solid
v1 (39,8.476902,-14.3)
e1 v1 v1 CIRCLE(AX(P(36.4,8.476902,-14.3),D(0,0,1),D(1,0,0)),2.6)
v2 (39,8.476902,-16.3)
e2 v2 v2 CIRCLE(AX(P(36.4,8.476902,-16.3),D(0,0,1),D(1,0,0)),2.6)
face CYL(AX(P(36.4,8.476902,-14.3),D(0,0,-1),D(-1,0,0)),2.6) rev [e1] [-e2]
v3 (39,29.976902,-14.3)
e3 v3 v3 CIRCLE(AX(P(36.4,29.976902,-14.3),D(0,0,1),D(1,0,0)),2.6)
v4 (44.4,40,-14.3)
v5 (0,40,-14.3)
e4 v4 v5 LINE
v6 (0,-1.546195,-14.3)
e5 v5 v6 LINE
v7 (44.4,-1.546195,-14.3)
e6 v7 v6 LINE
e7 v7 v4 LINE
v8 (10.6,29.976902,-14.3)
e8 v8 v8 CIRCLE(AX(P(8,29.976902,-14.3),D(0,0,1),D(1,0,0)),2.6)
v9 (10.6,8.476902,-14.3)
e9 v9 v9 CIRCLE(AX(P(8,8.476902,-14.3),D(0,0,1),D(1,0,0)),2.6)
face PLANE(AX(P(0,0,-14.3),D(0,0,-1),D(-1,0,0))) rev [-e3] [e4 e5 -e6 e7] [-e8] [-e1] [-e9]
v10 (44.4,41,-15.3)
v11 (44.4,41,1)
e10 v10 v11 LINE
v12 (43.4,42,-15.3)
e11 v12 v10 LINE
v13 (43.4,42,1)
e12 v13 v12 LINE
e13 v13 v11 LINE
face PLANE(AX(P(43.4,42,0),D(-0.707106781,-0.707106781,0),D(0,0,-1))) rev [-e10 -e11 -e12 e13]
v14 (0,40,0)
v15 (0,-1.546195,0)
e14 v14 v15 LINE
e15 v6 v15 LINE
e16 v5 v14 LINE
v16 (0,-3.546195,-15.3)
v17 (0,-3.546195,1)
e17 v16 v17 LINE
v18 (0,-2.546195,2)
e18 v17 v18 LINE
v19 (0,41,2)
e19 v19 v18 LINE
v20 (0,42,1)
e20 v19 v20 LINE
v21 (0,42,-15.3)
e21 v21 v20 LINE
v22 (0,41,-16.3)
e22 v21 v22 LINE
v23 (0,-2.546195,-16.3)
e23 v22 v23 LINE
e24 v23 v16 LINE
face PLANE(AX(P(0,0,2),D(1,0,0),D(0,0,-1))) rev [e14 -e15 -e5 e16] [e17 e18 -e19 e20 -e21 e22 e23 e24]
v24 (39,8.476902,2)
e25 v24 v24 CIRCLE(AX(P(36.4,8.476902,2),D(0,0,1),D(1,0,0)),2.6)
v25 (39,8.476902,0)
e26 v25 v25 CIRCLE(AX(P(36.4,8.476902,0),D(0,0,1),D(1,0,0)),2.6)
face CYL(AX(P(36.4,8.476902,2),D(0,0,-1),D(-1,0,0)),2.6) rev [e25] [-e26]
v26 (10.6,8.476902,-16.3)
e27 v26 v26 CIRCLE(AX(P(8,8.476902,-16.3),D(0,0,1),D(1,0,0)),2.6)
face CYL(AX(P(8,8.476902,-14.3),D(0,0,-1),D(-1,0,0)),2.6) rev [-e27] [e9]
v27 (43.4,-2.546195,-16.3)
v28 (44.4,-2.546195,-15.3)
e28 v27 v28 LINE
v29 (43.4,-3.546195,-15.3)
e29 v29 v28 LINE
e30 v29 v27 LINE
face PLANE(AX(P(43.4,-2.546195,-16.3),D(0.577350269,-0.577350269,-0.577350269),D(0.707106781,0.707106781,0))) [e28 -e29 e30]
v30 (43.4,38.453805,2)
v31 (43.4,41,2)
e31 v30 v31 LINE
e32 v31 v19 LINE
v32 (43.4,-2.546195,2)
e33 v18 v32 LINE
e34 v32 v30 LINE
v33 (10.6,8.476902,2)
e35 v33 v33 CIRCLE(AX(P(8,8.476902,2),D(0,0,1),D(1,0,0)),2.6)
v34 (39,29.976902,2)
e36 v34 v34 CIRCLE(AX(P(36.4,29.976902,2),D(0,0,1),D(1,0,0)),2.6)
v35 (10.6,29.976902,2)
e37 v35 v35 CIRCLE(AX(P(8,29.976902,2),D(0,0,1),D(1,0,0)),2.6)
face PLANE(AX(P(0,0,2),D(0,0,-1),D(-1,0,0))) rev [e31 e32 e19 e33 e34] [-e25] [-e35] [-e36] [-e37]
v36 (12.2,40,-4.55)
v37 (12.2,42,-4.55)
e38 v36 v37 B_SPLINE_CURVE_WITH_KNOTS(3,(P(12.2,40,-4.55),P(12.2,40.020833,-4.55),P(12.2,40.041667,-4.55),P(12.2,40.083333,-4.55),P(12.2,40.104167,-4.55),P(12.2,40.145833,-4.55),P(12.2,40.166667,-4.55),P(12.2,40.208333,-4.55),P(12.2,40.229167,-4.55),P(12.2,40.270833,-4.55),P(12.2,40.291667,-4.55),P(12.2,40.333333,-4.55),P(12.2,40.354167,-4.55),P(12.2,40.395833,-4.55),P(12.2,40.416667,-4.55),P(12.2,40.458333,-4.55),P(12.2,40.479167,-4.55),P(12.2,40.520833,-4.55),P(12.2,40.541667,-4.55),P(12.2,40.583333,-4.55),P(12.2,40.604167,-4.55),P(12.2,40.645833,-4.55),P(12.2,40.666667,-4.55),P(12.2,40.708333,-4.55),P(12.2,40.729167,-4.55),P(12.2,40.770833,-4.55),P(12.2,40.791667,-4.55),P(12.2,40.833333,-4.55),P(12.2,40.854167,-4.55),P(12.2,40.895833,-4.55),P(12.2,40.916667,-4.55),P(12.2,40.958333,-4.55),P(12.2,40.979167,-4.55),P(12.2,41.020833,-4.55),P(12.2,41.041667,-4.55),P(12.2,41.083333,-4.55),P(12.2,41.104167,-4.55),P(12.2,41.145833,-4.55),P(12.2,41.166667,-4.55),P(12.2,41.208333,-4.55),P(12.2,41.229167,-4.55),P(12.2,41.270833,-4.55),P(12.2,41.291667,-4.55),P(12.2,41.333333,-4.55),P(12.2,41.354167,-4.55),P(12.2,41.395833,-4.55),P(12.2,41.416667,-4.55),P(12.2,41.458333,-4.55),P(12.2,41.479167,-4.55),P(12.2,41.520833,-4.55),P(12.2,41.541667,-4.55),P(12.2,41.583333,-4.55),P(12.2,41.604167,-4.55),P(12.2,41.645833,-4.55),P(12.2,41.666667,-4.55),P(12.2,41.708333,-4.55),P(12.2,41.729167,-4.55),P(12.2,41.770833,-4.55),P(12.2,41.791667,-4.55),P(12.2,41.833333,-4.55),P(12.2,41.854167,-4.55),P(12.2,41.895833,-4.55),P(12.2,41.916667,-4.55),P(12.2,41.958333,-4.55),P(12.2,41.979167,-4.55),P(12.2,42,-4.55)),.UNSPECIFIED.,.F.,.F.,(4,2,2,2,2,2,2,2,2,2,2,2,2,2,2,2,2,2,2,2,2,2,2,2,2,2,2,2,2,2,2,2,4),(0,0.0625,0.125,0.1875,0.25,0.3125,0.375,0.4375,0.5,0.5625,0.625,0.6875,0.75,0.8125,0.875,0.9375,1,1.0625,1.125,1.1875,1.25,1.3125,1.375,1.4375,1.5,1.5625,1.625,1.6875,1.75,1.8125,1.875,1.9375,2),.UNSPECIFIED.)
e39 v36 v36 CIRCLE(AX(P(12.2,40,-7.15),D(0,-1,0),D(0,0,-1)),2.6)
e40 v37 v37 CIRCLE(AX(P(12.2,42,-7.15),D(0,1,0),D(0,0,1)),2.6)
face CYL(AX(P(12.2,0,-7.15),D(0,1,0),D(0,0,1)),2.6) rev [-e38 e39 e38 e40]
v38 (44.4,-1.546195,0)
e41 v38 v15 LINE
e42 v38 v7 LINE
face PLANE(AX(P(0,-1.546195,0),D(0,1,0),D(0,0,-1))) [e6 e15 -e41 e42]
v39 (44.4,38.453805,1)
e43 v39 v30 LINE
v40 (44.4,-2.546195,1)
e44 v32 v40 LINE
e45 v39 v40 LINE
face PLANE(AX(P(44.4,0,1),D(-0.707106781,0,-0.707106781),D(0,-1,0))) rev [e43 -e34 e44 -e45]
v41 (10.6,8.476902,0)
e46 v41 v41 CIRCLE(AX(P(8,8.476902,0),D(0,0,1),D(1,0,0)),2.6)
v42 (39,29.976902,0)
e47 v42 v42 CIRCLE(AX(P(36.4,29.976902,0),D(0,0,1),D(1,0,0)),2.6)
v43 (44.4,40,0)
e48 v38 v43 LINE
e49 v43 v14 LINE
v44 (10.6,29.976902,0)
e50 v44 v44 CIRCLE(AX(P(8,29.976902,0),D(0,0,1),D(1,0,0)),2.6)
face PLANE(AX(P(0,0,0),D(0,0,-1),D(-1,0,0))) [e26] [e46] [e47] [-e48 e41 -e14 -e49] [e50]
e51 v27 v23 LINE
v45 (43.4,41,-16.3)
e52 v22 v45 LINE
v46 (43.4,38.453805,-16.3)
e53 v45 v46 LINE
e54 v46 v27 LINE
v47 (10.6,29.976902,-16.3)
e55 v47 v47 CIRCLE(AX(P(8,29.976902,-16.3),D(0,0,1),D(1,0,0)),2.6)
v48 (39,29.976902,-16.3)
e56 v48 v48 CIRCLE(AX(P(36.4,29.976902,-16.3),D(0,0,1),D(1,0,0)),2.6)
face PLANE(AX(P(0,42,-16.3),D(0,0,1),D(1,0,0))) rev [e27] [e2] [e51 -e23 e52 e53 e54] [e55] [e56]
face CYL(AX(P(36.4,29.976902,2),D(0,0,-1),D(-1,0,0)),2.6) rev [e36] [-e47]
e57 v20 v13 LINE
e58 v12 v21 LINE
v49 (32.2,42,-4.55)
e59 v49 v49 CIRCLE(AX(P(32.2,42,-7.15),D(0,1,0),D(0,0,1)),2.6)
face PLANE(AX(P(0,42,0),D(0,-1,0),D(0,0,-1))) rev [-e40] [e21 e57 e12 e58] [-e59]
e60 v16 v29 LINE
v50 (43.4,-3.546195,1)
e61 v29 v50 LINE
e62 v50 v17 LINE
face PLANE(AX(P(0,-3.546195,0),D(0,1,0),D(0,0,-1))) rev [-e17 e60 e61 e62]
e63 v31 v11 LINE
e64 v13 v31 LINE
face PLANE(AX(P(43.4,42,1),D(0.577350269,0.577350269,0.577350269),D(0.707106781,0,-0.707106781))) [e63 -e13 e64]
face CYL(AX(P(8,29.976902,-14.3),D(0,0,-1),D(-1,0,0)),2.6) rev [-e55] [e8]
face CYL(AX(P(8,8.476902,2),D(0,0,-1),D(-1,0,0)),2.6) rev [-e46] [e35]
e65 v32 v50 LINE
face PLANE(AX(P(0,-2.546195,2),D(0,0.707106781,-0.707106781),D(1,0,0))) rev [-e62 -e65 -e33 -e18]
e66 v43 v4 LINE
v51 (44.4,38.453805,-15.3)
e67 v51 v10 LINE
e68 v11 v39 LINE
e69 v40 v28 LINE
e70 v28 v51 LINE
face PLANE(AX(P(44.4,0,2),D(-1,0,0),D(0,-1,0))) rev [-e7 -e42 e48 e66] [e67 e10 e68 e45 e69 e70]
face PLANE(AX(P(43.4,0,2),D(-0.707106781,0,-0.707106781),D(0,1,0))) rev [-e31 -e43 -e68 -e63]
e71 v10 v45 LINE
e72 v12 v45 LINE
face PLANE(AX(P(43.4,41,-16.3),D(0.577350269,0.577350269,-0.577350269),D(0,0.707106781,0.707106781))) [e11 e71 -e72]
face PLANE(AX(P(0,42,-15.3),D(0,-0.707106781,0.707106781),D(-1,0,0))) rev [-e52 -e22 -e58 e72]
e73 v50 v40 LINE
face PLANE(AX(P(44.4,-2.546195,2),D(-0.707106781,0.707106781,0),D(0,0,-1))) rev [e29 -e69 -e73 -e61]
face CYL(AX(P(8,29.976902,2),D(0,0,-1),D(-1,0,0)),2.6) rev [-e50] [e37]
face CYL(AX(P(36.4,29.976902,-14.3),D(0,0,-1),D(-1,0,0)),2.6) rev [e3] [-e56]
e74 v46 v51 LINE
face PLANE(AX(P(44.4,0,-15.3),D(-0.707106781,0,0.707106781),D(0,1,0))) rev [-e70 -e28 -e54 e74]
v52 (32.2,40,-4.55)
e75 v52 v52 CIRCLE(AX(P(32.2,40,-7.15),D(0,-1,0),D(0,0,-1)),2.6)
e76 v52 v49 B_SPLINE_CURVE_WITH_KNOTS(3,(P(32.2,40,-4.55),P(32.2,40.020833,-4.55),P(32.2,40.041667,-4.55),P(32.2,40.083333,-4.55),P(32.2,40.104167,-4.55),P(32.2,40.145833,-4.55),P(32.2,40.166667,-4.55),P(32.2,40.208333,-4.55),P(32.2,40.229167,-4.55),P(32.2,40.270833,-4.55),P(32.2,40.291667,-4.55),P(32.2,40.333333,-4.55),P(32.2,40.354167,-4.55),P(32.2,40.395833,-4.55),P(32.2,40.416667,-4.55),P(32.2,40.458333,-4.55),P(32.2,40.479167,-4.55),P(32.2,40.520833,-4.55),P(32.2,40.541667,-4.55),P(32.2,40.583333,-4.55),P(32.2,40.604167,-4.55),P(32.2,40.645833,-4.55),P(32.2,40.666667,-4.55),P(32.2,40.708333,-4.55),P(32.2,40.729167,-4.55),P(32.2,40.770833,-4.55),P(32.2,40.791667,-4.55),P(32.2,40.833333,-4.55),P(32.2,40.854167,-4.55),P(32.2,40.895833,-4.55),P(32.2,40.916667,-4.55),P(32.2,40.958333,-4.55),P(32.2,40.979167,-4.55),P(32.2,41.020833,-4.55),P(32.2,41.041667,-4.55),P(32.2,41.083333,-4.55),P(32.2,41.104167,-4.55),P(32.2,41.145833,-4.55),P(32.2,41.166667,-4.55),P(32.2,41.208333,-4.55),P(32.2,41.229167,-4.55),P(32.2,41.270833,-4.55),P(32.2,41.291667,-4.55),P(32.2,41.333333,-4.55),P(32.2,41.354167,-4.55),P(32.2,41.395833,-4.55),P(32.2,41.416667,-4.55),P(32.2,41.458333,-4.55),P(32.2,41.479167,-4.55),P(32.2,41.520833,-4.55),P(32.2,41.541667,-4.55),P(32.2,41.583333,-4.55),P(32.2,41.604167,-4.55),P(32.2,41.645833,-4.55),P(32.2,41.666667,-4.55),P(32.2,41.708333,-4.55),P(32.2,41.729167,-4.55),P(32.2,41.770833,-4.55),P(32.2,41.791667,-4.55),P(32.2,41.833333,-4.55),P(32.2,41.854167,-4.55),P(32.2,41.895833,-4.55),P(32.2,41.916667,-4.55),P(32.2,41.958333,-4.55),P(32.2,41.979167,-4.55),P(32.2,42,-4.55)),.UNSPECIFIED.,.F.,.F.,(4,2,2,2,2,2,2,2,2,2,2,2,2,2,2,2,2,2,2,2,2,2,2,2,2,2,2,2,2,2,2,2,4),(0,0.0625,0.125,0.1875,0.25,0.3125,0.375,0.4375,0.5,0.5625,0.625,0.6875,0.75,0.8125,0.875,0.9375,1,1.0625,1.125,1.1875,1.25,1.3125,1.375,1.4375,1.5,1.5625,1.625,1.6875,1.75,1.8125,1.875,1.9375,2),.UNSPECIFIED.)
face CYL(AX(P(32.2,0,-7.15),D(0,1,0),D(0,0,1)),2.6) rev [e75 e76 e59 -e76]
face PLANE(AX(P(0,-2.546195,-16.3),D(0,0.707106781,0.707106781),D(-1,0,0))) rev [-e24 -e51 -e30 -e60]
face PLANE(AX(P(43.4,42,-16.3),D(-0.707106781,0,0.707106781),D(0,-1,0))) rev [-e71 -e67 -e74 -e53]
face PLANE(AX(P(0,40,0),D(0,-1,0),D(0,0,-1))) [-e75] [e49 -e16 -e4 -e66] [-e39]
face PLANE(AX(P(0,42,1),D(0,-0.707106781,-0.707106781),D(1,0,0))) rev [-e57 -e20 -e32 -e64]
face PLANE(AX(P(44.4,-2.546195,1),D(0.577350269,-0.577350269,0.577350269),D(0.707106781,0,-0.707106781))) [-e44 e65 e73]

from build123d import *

# Parameters (mm, degrees)
SKETCH1_W               = 44.4
SKETCH1_H               = 40
SKETCH1_R               = 2.6
BOSS_EXTRUDE1_DEPTH     = 2
SKETCH2_W               = 44.4
SKETCH2_H               = 18.3
BOSS_EXTRUDE2_DEPTH     = 2
LPATTERN1_COUNT         = 2
LPATTERN1_PITCH         = 16.3
SKETCH3_R               = 2.6
CUT_EXTRUDE1_DEPTH      = 64.253853638
CHAMFER1_SIZE           = 1
MIRROR1_COPY_1_SKETCH_W = 44.4
MIRROR1_COPY_1_SKETCH_H = 40
MIRROR1_COPY_1_SKETCH_R = 2.6
MIRROR1_COPY_1_DEPTH    = 2
CHAMFER3_SIZE           = 1


with BuildPart() as part:
    # Sketch1 → Boss-Extrude1 (new body)
    with BuildSketch(Plane.XY):
        with Locations((22.2, 20)):
            Rectangle(SKETCH1_W, SKETCH1_H)
        with Locations((8, 8.476902454)):
            Circle(SKETCH1_R, mode=Mode.SUBTRACT)
        with Locations((8, 29.976902454)):
            Circle(SKETCH1_R, mode=Mode.SUBTRACT)
        with Locations((36.4, 29.976902454)):
            Circle(SKETCH1_R, mode=Mode.SUBTRACT)
        with Locations((36.4, 8.476902454)):
            Circle(SKETCH1_R, mode=Mode.SUBTRACT)
    boss_extrude1 = extrude(amount=BOSS_EXTRUDE1_DEPTH)

    # Sketch2 → Boss-Extrude2 (add)
    with BuildSketch(Plane(origin=(0, 40, 0), x_dir=(1, 0, 0), z_dir=(0, 1, 0))):
        with Locations((22.2, 7.15)):
            Rectangle(SKETCH2_W, SKETCH2_H)
    boss_extrude2 = extrude(amount=BOSS_EXTRUDE2_DEPTH)

    # LPattern1: Boss-Extrude1 ×2
    with Locations(*[(0, 0, -i * LPATTERN1_PITCH) for i in range(1, LPATTERN1_COUNT)]):
        add(boss_extrude1)

    # Sketch3 → Cut-Extrude1 (cut, through all)
    with BuildSketch(Plane(origin=(0, 42, 0), x_dir=(1, 0, 0), z_dir=(0, 1, 0))):
        with Locations(Location((12.2, 7.15, 0), (0, 0, 270))):
            Circle(SKETCH3_R)
        with Locations(Location((32.2, 7.15, 0), (0, 0, 270))):
            Circle(SKETCH3_R)
    extrude(amount=-CUT_EXTRUDE1_DEPTH, mode=Mode.SUBTRACT)

    # Chamfer1
    chamfer1_edges = [part.edges().sort_by_distance(p)[0] for p in [
        (44.4, 21, 2),
        (44.4, 21, -16.3),
        (22.2, 42, 2),
        (44.4, 42, -7.15),
        (22.2, 42, -16.3),
        (22.2, 0, -16.3),
        (0, 0, -15.3),
        (44.4, 0, -15.3),
        (44.4, 0, 1),
        (0, 0, 1),
        (22.2, 0, 2),
    ]]
    chamfer(chamfer1_edges, length=CHAMFER1_SIZE)

    # Mirror1: Boss-Extrude1, Boss-Extrude2 across plane
    add(boss_extrude1.mirror(Plane.ZX.offset(19.226902454)))
    add(boss_extrude2.mirror(Plane.ZX.offset(19.226902454)))

    # Mirror1 copy 1 sketch → Mirror1 copy 1 (add)
    with BuildSketch(Plane(origin=(0, 38.453804908, -16.3), x_dir=(1, 0, 0), z_dir=(0, 0, 1))):
        with Locations((22.2, -20)):
            Rectangle(MIRROR1_COPY_1_SKETCH_W, MIRROR1_COPY_1_SKETCH_H)
        with Locations((8, -8.476902454)):
            Circle(MIRROR1_COPY_1_SKETCH_R, mode=Mode.SUBTRACT)
        with Locations((8, -29.976902454)):
            Circle(MIRROR1_COPY_1_SKETCH_R, mode=Mode.SUBTRACT)
        with Locations((36.4, -29.976902454)):
            Circle(MIRROR1_COPY_1_SKETCH_R, mode=Mode.SUBTRACT)
        with Locations((36.4, -8.476902454)):
            Circle(MIRROR1_COPY_1_SKETCH_R, mode=Mode.SUBTRACT)
    extrude(amount=MIRROR1_COPY_1_DEPTH)

    # Chamfer3
    chamfer3_edges = [part.edges().sort_by_distance(p)[0] for p in [
        (44.4, 17.453804908, 2),
        (44.4, 17.453804908, -16.3),
        (22.2, -3.546195092, -16.3),
        (44.4, -3.546195092, -7.15),
        (22.2, -3.546195092, 2),
    ]]
    chamfer(chamfer3_edges, length=CHAMFER3_SIZE - 0.0001)  # a hair under: the kernel refuses the full size


solid = part.part
